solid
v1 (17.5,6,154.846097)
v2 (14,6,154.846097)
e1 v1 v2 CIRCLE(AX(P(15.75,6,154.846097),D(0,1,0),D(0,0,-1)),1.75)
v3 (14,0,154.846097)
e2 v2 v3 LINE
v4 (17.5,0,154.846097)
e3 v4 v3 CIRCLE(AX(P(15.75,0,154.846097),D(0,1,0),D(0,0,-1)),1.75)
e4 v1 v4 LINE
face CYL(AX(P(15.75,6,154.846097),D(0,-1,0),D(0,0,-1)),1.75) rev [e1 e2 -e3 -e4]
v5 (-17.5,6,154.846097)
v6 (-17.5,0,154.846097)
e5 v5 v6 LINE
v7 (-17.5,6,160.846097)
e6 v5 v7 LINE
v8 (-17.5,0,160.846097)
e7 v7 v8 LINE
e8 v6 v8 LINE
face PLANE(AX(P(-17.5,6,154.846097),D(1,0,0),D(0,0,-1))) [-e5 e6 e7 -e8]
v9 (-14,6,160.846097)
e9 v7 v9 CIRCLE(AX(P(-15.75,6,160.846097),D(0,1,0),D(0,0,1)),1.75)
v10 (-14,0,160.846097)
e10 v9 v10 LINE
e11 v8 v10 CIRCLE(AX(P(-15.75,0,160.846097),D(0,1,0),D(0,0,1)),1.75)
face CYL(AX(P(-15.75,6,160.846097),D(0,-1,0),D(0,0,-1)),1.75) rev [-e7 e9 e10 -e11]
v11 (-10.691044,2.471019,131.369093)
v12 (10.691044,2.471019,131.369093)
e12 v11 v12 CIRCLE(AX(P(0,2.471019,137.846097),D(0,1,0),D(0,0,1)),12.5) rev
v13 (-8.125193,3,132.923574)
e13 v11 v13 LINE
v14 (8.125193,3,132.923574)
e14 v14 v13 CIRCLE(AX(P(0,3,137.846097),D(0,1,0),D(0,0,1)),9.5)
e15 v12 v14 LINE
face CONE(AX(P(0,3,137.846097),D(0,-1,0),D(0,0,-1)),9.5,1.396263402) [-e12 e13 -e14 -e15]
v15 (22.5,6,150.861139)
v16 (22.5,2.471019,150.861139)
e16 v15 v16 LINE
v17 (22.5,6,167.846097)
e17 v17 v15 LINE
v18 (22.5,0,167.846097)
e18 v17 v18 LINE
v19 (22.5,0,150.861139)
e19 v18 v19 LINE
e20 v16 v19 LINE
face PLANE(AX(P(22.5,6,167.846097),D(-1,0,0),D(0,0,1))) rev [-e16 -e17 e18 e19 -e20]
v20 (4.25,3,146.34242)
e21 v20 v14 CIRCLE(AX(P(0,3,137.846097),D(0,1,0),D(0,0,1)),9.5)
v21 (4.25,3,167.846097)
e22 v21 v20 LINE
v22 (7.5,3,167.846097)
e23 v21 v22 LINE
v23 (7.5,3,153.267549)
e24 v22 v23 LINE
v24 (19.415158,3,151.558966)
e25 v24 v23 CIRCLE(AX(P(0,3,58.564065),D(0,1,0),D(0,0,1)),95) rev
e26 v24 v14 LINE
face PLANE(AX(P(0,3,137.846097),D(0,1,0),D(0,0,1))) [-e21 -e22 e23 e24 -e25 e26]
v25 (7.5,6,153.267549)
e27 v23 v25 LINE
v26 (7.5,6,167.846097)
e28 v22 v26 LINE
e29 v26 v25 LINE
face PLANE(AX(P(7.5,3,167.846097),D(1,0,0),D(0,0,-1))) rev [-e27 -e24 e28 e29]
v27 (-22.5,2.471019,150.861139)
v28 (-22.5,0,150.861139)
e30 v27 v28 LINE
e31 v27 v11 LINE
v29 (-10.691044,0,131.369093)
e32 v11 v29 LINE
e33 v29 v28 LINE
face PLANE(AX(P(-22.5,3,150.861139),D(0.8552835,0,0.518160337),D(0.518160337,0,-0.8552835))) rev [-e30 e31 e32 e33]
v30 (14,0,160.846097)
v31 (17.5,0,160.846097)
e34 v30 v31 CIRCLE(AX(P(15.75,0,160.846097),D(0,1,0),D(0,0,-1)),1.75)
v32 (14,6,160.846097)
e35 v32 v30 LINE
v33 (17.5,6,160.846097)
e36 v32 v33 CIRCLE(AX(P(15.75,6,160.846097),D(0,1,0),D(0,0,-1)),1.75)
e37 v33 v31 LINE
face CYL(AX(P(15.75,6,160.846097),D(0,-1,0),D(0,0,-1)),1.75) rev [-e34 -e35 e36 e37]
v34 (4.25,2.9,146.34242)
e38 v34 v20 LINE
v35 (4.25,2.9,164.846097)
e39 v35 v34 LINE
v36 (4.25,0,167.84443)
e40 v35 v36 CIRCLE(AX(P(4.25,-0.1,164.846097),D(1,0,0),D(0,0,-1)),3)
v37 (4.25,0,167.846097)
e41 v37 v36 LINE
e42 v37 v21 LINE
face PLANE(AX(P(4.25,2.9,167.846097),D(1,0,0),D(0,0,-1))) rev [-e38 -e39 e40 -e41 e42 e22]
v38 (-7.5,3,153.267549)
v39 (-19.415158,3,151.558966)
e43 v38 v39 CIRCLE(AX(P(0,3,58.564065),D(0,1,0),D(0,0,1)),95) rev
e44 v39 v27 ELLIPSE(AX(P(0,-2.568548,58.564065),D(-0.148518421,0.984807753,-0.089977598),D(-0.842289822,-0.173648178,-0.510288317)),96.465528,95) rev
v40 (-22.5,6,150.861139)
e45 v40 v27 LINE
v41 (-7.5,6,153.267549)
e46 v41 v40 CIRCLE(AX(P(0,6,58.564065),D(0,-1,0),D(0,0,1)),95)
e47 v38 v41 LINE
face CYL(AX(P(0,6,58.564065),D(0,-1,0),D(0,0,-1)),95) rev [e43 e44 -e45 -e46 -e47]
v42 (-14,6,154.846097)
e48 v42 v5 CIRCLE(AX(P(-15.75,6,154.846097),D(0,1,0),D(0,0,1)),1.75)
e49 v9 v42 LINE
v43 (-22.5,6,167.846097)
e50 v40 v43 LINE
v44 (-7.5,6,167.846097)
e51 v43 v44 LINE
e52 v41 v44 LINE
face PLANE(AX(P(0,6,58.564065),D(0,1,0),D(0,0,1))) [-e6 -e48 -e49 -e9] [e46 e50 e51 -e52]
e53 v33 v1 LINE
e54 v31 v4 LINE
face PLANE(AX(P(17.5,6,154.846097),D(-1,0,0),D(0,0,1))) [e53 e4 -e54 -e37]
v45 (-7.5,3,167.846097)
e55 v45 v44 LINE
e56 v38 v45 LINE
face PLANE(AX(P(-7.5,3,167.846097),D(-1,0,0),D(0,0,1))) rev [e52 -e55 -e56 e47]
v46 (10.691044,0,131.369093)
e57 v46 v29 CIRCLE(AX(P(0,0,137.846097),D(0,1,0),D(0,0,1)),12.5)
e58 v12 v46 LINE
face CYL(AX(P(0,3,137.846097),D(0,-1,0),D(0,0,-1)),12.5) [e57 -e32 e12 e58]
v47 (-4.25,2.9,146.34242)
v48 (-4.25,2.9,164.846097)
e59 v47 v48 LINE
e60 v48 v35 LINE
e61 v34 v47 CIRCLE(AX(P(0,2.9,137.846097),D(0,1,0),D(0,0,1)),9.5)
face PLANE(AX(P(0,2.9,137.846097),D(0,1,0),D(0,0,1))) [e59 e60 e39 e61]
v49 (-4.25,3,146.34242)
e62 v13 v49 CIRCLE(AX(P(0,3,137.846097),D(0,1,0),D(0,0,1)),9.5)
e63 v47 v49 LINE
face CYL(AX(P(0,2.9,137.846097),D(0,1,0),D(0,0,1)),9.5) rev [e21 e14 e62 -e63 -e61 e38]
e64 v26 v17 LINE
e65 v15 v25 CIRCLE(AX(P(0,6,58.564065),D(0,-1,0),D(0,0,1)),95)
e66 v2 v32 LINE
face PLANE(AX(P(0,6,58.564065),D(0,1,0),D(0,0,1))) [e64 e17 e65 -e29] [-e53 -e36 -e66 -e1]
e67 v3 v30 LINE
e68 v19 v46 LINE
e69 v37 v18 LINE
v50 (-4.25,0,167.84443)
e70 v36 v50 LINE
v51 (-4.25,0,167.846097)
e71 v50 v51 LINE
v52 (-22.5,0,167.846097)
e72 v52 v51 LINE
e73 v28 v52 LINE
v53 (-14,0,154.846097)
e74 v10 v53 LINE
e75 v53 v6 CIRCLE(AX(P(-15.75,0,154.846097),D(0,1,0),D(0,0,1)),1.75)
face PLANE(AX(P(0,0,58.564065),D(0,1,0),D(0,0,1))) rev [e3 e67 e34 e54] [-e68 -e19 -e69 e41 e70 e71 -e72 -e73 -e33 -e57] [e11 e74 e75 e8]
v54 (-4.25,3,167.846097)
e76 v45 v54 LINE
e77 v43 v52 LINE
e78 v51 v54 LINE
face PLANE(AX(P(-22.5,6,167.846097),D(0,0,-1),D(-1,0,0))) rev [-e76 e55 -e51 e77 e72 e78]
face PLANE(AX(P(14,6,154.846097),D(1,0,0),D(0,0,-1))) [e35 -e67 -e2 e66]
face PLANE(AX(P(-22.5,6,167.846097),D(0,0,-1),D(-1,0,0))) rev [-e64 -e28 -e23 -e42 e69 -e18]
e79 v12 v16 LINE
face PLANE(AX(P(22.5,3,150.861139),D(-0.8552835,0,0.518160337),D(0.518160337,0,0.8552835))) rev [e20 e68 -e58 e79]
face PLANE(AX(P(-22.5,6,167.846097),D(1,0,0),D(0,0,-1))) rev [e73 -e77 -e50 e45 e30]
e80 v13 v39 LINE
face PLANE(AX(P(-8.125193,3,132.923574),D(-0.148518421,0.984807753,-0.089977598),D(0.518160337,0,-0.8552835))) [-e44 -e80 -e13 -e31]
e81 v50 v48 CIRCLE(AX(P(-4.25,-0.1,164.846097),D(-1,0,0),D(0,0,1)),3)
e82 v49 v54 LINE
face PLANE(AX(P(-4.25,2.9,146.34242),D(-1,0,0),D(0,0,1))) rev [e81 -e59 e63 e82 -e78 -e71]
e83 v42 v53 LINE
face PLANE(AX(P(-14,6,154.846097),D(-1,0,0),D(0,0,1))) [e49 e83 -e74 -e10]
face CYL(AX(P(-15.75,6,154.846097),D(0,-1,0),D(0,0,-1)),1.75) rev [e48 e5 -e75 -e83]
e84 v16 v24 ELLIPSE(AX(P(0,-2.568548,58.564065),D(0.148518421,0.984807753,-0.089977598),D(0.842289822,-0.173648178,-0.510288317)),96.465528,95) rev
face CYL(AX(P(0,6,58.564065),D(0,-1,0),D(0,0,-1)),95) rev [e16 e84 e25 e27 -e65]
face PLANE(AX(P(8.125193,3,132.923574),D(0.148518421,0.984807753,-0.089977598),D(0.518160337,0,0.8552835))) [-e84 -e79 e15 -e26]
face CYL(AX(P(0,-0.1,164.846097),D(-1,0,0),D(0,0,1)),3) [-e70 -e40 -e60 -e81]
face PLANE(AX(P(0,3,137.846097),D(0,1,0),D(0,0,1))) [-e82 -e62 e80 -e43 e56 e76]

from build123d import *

# Parameters (mm, degrees)
BOSS_EXTRUDE1_DEPTH = 6
BOSS_EXTRUDE2_DEPTH = 3
SKETCH3_W           = 15
SKETCH3_H           = 14.578547678
CUT_EXTRUDE1_DEPTH  = 3
CUT_EXTRUDE2_DEPTH  = 0.1
FILLET1_R           = 3
CHAMFER1_SIZE       = 0.528980942
CHAMFER1_SIZE_2     = 3


with BuildPart() as part:
    # Sketch1 → Boss-Extrude1 (new body)
    with BuildSketch(Plane(origin=(0, 0, 0), x_dir=(1, 0, 0), z_dir=(0, 1, 0))):
        with BuildLine():
            Line((22.5, -167.846096908), (22.5, -150.861139315))
            ThreePointArc((22.5, -150.861139315), (0, -153.564064606), (-22.5, -150.861139315))
            Line((-22.5, -150.861139315), (-22.5, -167.846096908))
            Line((-22.5, -167.846096908), (22.5, -167.846096908))
        make_face()
        with BuildLine():
            Line((-17.5, -154.846096908), (-17.5, -160.846096908))
            ThreePointArc((-17.5, -160.846096908), (-15.75, -162.596096908), (-14, -160.846096908))
            Line((-14, -160.846096908), (-14, -154.846096908))
            ThreePointArc((-14, -154.846096908), (-15.75, -153.096096908), (-17.5, -154.846096908))
        make_face(mode=Mode.SUBTRACT)
        with BuildLine():
            Line((14, -154.846096908), (14, -160.846096908))
            ThreePointArc((14, -160.846096908), (15.75, -162.596096908), (17.5, -160.846096908))
            Line((17.5, -160.846096908), (17.5, -154.846096908))
            ThreePointArc((17.5, -154.846096908), (15.75, -153.096096908), (14, -154.846096908))
        make_face(mode=Mode.SUBTRACT)
    extrude(amount=BOSS_EXTRUDE1_DEPTH)

    # Sketch2 → Boss-Extrude2 (add)
    with BuildSketch(Plane(origin=(0, 0, 0), x_dir=(1, 0, 0), z_dir=(0, 1, 0))):
        with BuildLine():
            Line((-22.5, -167.846096908), (22.5, -167.846096908))
            Line((22.5, -167.846096908), (22.5, -150.861139315))
            Line((22.5, -150.861139315), (10.691043752, -131.369092702))
            ThreePointArc((10.691043752, -131.369092702), (0, -125.346096908), (-10.691043752, -131.369092702))
            Line((-10.691043752, -131.369092702), (-22.5, -150.861139315))
            Line((-22.5, -150.861139315), (-22.5, -167.846096908))
        make_face()
        with BuildLine():
            Line((-17.5, -154.846096908), (-17.5, -160.846096908))
            ThreePointArc((-17.5, -160.846096908), (-15.75, -162.596096908), (-14, -160.846096908))
            Line((-14, -160.846096908), (-14, -154.846096908))
            ThreePointArc((-14, -154.846096908), (-15.75, -153.096096908), (-17.5, -154.846096908))
        make_face(mode=Mode.SUBTRACT)
        with BuildLine():
            Line((14, -154.846096908), (14, -160.846096908))
            ThreePointArc((14, -160.846096908), (15.75, -162.596096908), (17.5, -160.846096908))
            Line((17.5, -160.846096908), (17.5, -154.846096908))
            ThreePointArc((17.5, -154.846096908), (15.75, -153.096096908), (14, -154.846096908))
        make_face(mode=Mode.SUBTRACT)
    extrude(amount=BOSS_EXTRUDE2_DEPTH)

    # Sketch3 → Cut-Extrude1 (cut)
    with BuildSketch(Plane(origin=(0, 6, 0), x_dir=(1, 0, 0), z_dir=(0, 1, 0))):
        with Locations((0, -160.556823069)):
            Rectangle(SKETCH3_W, SKETCH3_H)
    extrude(amount=-CUT_EXTRUDE1_DEPTH, mode=Mode.SUBTRACT)

    # Sketch4 → Cut-Extrude2 (cut)
    with BuildSketch(Plane(origin=(0, 3, 0), x_dir=(1, 0, 0), z_dir=(0, 1, 0))):
        with BuildLine():
            Line((-4.25, -146.342419642), (-4.25, -167.846096908))
            Line((-4.25, -167.846096908), (4.25, -167.846096908))
            Line((4.25, -167.846096908), (4.25, -146.342419642))
            ThreePointArc((4.25, -146.342419642), (0, -128.346096908), (-4.25, -146.342419642))
        make_face()
    extrude(amount=-CUT_EXTRUDE2_DEPTH, mode=Mode.SUBTRACT)

    # Fillet1
    # the kernel refuses this fillet: 3 mm, written as the material it takes off along each edge
    with BuildSketch(Plane(origin=(-4.25, 2.9, 167.846096908), x_dir=(0, -1, 0), z_dir=(1, 0, 0))) as fillet1_piece_1:
        with BuildLine():
            CenterArc((FILLET1_R, FILLET1_R), FILLET1_R, 180, 90)
            Line((0, FILLET1_R), (0, 0))
            Line((0, 0), (FILLET1_R, 0))
        make_face()
    extrude(amount=8.5, mode=Mode.SUBTRACT)

    # Chamfer1
    # the kernel refuses this chamfer: 3, 0.528980942 mm, written as the material it takes off along each edge
    with BuildSketch(Plane(origin=(26.539379212, 3, 157.528601387), x_dir=(0.1797282148286355, -0.9776715712462603, -0.10888557099717337), z_dir=(-0.5181603365296565, 0, -0.8552835001608959))) as chamfer1_piece_1_section:
        Polygon((CHAMFER1_SIZE * 0.977671571478, CHAMFER1_SIZE * 0.210138760817), (-CHAMFER1_SIZE_2 * 0.210138760767, CHAMFER1_SIZE_2 * 0.977671571246), (0, 0), align=None)
    chamfer1_piece_1 = extrude(amount=30.585774986, mode=Mode.PRIVATE)
    chamfer1_piece_1 = chamfer1_piece_1 & Plane(origin=(0, 2.81678549, 58.564064606), x_dir=(0.23684210526315766, 0, 0.9715481548407755), z_dir=(0, -1, 0)) * Cylinder(95, 73, mode=Mode.PRIVATE)
    add(chamfer1_piece_1, mode=Mode.SUBTRACT)
    with BuildSketch(Plane(origin=(0, 3, 137.846096908), x_dir=(0.8552835001609747, 0, -0.5181603365295261), z_dir=(0.5181603365295261, 0, 0.8552835001609747))) as chamfer1_piece_2:
        Polygon((12.5, -CHAMFER1_SIZE), (12.5 - CHAMFER1_SIZE_2, 0), (12.5, 0), align=None)
    revolve(axis=Axis((0, 3, 137.846096908), (0, 1, 0)), revolution_arc=117.582137566, mode=Mode.SUBTRACT)
    with BuildSketch(Plane(origin=(-10.691043752, 3, 131.369092702), x_dir=(0.8552644030796279, 0.0066825316561016845, 0.5181487668570801), z_dir=(-0.5181603365296562, 0, 0.855283500160896))) as chamfer1_piece_3_section:
        Polygon((CHAMFER1_SIZE_2 * 0.999977671636, -CHAMFER1_SIZE_2 * 0.0066825316561), (-CHAMFER1_SIZE * 0.00668253165769, -CHAMFER1_SIZE * 0.999977671873), (0, 0), align=None)
    chamfer1_piece_3 = extrude(amount=30.585774986, mode=Mode.PRIVATE)
    chamfer1_piece_3 = chamfer1_piece_3 & Plane(origin=(0, 2.847950314, 58.564064606), x_dir=(0.23684210526315766, 0, 0.9715481548407755), z_dir=(0, -1, 0)) * Cylinder(95, 74, mode=Mode.PRIVATE)
    add(chamfer1_piece_3, mode=Mode.SUBTRACT)


solid = part.part
